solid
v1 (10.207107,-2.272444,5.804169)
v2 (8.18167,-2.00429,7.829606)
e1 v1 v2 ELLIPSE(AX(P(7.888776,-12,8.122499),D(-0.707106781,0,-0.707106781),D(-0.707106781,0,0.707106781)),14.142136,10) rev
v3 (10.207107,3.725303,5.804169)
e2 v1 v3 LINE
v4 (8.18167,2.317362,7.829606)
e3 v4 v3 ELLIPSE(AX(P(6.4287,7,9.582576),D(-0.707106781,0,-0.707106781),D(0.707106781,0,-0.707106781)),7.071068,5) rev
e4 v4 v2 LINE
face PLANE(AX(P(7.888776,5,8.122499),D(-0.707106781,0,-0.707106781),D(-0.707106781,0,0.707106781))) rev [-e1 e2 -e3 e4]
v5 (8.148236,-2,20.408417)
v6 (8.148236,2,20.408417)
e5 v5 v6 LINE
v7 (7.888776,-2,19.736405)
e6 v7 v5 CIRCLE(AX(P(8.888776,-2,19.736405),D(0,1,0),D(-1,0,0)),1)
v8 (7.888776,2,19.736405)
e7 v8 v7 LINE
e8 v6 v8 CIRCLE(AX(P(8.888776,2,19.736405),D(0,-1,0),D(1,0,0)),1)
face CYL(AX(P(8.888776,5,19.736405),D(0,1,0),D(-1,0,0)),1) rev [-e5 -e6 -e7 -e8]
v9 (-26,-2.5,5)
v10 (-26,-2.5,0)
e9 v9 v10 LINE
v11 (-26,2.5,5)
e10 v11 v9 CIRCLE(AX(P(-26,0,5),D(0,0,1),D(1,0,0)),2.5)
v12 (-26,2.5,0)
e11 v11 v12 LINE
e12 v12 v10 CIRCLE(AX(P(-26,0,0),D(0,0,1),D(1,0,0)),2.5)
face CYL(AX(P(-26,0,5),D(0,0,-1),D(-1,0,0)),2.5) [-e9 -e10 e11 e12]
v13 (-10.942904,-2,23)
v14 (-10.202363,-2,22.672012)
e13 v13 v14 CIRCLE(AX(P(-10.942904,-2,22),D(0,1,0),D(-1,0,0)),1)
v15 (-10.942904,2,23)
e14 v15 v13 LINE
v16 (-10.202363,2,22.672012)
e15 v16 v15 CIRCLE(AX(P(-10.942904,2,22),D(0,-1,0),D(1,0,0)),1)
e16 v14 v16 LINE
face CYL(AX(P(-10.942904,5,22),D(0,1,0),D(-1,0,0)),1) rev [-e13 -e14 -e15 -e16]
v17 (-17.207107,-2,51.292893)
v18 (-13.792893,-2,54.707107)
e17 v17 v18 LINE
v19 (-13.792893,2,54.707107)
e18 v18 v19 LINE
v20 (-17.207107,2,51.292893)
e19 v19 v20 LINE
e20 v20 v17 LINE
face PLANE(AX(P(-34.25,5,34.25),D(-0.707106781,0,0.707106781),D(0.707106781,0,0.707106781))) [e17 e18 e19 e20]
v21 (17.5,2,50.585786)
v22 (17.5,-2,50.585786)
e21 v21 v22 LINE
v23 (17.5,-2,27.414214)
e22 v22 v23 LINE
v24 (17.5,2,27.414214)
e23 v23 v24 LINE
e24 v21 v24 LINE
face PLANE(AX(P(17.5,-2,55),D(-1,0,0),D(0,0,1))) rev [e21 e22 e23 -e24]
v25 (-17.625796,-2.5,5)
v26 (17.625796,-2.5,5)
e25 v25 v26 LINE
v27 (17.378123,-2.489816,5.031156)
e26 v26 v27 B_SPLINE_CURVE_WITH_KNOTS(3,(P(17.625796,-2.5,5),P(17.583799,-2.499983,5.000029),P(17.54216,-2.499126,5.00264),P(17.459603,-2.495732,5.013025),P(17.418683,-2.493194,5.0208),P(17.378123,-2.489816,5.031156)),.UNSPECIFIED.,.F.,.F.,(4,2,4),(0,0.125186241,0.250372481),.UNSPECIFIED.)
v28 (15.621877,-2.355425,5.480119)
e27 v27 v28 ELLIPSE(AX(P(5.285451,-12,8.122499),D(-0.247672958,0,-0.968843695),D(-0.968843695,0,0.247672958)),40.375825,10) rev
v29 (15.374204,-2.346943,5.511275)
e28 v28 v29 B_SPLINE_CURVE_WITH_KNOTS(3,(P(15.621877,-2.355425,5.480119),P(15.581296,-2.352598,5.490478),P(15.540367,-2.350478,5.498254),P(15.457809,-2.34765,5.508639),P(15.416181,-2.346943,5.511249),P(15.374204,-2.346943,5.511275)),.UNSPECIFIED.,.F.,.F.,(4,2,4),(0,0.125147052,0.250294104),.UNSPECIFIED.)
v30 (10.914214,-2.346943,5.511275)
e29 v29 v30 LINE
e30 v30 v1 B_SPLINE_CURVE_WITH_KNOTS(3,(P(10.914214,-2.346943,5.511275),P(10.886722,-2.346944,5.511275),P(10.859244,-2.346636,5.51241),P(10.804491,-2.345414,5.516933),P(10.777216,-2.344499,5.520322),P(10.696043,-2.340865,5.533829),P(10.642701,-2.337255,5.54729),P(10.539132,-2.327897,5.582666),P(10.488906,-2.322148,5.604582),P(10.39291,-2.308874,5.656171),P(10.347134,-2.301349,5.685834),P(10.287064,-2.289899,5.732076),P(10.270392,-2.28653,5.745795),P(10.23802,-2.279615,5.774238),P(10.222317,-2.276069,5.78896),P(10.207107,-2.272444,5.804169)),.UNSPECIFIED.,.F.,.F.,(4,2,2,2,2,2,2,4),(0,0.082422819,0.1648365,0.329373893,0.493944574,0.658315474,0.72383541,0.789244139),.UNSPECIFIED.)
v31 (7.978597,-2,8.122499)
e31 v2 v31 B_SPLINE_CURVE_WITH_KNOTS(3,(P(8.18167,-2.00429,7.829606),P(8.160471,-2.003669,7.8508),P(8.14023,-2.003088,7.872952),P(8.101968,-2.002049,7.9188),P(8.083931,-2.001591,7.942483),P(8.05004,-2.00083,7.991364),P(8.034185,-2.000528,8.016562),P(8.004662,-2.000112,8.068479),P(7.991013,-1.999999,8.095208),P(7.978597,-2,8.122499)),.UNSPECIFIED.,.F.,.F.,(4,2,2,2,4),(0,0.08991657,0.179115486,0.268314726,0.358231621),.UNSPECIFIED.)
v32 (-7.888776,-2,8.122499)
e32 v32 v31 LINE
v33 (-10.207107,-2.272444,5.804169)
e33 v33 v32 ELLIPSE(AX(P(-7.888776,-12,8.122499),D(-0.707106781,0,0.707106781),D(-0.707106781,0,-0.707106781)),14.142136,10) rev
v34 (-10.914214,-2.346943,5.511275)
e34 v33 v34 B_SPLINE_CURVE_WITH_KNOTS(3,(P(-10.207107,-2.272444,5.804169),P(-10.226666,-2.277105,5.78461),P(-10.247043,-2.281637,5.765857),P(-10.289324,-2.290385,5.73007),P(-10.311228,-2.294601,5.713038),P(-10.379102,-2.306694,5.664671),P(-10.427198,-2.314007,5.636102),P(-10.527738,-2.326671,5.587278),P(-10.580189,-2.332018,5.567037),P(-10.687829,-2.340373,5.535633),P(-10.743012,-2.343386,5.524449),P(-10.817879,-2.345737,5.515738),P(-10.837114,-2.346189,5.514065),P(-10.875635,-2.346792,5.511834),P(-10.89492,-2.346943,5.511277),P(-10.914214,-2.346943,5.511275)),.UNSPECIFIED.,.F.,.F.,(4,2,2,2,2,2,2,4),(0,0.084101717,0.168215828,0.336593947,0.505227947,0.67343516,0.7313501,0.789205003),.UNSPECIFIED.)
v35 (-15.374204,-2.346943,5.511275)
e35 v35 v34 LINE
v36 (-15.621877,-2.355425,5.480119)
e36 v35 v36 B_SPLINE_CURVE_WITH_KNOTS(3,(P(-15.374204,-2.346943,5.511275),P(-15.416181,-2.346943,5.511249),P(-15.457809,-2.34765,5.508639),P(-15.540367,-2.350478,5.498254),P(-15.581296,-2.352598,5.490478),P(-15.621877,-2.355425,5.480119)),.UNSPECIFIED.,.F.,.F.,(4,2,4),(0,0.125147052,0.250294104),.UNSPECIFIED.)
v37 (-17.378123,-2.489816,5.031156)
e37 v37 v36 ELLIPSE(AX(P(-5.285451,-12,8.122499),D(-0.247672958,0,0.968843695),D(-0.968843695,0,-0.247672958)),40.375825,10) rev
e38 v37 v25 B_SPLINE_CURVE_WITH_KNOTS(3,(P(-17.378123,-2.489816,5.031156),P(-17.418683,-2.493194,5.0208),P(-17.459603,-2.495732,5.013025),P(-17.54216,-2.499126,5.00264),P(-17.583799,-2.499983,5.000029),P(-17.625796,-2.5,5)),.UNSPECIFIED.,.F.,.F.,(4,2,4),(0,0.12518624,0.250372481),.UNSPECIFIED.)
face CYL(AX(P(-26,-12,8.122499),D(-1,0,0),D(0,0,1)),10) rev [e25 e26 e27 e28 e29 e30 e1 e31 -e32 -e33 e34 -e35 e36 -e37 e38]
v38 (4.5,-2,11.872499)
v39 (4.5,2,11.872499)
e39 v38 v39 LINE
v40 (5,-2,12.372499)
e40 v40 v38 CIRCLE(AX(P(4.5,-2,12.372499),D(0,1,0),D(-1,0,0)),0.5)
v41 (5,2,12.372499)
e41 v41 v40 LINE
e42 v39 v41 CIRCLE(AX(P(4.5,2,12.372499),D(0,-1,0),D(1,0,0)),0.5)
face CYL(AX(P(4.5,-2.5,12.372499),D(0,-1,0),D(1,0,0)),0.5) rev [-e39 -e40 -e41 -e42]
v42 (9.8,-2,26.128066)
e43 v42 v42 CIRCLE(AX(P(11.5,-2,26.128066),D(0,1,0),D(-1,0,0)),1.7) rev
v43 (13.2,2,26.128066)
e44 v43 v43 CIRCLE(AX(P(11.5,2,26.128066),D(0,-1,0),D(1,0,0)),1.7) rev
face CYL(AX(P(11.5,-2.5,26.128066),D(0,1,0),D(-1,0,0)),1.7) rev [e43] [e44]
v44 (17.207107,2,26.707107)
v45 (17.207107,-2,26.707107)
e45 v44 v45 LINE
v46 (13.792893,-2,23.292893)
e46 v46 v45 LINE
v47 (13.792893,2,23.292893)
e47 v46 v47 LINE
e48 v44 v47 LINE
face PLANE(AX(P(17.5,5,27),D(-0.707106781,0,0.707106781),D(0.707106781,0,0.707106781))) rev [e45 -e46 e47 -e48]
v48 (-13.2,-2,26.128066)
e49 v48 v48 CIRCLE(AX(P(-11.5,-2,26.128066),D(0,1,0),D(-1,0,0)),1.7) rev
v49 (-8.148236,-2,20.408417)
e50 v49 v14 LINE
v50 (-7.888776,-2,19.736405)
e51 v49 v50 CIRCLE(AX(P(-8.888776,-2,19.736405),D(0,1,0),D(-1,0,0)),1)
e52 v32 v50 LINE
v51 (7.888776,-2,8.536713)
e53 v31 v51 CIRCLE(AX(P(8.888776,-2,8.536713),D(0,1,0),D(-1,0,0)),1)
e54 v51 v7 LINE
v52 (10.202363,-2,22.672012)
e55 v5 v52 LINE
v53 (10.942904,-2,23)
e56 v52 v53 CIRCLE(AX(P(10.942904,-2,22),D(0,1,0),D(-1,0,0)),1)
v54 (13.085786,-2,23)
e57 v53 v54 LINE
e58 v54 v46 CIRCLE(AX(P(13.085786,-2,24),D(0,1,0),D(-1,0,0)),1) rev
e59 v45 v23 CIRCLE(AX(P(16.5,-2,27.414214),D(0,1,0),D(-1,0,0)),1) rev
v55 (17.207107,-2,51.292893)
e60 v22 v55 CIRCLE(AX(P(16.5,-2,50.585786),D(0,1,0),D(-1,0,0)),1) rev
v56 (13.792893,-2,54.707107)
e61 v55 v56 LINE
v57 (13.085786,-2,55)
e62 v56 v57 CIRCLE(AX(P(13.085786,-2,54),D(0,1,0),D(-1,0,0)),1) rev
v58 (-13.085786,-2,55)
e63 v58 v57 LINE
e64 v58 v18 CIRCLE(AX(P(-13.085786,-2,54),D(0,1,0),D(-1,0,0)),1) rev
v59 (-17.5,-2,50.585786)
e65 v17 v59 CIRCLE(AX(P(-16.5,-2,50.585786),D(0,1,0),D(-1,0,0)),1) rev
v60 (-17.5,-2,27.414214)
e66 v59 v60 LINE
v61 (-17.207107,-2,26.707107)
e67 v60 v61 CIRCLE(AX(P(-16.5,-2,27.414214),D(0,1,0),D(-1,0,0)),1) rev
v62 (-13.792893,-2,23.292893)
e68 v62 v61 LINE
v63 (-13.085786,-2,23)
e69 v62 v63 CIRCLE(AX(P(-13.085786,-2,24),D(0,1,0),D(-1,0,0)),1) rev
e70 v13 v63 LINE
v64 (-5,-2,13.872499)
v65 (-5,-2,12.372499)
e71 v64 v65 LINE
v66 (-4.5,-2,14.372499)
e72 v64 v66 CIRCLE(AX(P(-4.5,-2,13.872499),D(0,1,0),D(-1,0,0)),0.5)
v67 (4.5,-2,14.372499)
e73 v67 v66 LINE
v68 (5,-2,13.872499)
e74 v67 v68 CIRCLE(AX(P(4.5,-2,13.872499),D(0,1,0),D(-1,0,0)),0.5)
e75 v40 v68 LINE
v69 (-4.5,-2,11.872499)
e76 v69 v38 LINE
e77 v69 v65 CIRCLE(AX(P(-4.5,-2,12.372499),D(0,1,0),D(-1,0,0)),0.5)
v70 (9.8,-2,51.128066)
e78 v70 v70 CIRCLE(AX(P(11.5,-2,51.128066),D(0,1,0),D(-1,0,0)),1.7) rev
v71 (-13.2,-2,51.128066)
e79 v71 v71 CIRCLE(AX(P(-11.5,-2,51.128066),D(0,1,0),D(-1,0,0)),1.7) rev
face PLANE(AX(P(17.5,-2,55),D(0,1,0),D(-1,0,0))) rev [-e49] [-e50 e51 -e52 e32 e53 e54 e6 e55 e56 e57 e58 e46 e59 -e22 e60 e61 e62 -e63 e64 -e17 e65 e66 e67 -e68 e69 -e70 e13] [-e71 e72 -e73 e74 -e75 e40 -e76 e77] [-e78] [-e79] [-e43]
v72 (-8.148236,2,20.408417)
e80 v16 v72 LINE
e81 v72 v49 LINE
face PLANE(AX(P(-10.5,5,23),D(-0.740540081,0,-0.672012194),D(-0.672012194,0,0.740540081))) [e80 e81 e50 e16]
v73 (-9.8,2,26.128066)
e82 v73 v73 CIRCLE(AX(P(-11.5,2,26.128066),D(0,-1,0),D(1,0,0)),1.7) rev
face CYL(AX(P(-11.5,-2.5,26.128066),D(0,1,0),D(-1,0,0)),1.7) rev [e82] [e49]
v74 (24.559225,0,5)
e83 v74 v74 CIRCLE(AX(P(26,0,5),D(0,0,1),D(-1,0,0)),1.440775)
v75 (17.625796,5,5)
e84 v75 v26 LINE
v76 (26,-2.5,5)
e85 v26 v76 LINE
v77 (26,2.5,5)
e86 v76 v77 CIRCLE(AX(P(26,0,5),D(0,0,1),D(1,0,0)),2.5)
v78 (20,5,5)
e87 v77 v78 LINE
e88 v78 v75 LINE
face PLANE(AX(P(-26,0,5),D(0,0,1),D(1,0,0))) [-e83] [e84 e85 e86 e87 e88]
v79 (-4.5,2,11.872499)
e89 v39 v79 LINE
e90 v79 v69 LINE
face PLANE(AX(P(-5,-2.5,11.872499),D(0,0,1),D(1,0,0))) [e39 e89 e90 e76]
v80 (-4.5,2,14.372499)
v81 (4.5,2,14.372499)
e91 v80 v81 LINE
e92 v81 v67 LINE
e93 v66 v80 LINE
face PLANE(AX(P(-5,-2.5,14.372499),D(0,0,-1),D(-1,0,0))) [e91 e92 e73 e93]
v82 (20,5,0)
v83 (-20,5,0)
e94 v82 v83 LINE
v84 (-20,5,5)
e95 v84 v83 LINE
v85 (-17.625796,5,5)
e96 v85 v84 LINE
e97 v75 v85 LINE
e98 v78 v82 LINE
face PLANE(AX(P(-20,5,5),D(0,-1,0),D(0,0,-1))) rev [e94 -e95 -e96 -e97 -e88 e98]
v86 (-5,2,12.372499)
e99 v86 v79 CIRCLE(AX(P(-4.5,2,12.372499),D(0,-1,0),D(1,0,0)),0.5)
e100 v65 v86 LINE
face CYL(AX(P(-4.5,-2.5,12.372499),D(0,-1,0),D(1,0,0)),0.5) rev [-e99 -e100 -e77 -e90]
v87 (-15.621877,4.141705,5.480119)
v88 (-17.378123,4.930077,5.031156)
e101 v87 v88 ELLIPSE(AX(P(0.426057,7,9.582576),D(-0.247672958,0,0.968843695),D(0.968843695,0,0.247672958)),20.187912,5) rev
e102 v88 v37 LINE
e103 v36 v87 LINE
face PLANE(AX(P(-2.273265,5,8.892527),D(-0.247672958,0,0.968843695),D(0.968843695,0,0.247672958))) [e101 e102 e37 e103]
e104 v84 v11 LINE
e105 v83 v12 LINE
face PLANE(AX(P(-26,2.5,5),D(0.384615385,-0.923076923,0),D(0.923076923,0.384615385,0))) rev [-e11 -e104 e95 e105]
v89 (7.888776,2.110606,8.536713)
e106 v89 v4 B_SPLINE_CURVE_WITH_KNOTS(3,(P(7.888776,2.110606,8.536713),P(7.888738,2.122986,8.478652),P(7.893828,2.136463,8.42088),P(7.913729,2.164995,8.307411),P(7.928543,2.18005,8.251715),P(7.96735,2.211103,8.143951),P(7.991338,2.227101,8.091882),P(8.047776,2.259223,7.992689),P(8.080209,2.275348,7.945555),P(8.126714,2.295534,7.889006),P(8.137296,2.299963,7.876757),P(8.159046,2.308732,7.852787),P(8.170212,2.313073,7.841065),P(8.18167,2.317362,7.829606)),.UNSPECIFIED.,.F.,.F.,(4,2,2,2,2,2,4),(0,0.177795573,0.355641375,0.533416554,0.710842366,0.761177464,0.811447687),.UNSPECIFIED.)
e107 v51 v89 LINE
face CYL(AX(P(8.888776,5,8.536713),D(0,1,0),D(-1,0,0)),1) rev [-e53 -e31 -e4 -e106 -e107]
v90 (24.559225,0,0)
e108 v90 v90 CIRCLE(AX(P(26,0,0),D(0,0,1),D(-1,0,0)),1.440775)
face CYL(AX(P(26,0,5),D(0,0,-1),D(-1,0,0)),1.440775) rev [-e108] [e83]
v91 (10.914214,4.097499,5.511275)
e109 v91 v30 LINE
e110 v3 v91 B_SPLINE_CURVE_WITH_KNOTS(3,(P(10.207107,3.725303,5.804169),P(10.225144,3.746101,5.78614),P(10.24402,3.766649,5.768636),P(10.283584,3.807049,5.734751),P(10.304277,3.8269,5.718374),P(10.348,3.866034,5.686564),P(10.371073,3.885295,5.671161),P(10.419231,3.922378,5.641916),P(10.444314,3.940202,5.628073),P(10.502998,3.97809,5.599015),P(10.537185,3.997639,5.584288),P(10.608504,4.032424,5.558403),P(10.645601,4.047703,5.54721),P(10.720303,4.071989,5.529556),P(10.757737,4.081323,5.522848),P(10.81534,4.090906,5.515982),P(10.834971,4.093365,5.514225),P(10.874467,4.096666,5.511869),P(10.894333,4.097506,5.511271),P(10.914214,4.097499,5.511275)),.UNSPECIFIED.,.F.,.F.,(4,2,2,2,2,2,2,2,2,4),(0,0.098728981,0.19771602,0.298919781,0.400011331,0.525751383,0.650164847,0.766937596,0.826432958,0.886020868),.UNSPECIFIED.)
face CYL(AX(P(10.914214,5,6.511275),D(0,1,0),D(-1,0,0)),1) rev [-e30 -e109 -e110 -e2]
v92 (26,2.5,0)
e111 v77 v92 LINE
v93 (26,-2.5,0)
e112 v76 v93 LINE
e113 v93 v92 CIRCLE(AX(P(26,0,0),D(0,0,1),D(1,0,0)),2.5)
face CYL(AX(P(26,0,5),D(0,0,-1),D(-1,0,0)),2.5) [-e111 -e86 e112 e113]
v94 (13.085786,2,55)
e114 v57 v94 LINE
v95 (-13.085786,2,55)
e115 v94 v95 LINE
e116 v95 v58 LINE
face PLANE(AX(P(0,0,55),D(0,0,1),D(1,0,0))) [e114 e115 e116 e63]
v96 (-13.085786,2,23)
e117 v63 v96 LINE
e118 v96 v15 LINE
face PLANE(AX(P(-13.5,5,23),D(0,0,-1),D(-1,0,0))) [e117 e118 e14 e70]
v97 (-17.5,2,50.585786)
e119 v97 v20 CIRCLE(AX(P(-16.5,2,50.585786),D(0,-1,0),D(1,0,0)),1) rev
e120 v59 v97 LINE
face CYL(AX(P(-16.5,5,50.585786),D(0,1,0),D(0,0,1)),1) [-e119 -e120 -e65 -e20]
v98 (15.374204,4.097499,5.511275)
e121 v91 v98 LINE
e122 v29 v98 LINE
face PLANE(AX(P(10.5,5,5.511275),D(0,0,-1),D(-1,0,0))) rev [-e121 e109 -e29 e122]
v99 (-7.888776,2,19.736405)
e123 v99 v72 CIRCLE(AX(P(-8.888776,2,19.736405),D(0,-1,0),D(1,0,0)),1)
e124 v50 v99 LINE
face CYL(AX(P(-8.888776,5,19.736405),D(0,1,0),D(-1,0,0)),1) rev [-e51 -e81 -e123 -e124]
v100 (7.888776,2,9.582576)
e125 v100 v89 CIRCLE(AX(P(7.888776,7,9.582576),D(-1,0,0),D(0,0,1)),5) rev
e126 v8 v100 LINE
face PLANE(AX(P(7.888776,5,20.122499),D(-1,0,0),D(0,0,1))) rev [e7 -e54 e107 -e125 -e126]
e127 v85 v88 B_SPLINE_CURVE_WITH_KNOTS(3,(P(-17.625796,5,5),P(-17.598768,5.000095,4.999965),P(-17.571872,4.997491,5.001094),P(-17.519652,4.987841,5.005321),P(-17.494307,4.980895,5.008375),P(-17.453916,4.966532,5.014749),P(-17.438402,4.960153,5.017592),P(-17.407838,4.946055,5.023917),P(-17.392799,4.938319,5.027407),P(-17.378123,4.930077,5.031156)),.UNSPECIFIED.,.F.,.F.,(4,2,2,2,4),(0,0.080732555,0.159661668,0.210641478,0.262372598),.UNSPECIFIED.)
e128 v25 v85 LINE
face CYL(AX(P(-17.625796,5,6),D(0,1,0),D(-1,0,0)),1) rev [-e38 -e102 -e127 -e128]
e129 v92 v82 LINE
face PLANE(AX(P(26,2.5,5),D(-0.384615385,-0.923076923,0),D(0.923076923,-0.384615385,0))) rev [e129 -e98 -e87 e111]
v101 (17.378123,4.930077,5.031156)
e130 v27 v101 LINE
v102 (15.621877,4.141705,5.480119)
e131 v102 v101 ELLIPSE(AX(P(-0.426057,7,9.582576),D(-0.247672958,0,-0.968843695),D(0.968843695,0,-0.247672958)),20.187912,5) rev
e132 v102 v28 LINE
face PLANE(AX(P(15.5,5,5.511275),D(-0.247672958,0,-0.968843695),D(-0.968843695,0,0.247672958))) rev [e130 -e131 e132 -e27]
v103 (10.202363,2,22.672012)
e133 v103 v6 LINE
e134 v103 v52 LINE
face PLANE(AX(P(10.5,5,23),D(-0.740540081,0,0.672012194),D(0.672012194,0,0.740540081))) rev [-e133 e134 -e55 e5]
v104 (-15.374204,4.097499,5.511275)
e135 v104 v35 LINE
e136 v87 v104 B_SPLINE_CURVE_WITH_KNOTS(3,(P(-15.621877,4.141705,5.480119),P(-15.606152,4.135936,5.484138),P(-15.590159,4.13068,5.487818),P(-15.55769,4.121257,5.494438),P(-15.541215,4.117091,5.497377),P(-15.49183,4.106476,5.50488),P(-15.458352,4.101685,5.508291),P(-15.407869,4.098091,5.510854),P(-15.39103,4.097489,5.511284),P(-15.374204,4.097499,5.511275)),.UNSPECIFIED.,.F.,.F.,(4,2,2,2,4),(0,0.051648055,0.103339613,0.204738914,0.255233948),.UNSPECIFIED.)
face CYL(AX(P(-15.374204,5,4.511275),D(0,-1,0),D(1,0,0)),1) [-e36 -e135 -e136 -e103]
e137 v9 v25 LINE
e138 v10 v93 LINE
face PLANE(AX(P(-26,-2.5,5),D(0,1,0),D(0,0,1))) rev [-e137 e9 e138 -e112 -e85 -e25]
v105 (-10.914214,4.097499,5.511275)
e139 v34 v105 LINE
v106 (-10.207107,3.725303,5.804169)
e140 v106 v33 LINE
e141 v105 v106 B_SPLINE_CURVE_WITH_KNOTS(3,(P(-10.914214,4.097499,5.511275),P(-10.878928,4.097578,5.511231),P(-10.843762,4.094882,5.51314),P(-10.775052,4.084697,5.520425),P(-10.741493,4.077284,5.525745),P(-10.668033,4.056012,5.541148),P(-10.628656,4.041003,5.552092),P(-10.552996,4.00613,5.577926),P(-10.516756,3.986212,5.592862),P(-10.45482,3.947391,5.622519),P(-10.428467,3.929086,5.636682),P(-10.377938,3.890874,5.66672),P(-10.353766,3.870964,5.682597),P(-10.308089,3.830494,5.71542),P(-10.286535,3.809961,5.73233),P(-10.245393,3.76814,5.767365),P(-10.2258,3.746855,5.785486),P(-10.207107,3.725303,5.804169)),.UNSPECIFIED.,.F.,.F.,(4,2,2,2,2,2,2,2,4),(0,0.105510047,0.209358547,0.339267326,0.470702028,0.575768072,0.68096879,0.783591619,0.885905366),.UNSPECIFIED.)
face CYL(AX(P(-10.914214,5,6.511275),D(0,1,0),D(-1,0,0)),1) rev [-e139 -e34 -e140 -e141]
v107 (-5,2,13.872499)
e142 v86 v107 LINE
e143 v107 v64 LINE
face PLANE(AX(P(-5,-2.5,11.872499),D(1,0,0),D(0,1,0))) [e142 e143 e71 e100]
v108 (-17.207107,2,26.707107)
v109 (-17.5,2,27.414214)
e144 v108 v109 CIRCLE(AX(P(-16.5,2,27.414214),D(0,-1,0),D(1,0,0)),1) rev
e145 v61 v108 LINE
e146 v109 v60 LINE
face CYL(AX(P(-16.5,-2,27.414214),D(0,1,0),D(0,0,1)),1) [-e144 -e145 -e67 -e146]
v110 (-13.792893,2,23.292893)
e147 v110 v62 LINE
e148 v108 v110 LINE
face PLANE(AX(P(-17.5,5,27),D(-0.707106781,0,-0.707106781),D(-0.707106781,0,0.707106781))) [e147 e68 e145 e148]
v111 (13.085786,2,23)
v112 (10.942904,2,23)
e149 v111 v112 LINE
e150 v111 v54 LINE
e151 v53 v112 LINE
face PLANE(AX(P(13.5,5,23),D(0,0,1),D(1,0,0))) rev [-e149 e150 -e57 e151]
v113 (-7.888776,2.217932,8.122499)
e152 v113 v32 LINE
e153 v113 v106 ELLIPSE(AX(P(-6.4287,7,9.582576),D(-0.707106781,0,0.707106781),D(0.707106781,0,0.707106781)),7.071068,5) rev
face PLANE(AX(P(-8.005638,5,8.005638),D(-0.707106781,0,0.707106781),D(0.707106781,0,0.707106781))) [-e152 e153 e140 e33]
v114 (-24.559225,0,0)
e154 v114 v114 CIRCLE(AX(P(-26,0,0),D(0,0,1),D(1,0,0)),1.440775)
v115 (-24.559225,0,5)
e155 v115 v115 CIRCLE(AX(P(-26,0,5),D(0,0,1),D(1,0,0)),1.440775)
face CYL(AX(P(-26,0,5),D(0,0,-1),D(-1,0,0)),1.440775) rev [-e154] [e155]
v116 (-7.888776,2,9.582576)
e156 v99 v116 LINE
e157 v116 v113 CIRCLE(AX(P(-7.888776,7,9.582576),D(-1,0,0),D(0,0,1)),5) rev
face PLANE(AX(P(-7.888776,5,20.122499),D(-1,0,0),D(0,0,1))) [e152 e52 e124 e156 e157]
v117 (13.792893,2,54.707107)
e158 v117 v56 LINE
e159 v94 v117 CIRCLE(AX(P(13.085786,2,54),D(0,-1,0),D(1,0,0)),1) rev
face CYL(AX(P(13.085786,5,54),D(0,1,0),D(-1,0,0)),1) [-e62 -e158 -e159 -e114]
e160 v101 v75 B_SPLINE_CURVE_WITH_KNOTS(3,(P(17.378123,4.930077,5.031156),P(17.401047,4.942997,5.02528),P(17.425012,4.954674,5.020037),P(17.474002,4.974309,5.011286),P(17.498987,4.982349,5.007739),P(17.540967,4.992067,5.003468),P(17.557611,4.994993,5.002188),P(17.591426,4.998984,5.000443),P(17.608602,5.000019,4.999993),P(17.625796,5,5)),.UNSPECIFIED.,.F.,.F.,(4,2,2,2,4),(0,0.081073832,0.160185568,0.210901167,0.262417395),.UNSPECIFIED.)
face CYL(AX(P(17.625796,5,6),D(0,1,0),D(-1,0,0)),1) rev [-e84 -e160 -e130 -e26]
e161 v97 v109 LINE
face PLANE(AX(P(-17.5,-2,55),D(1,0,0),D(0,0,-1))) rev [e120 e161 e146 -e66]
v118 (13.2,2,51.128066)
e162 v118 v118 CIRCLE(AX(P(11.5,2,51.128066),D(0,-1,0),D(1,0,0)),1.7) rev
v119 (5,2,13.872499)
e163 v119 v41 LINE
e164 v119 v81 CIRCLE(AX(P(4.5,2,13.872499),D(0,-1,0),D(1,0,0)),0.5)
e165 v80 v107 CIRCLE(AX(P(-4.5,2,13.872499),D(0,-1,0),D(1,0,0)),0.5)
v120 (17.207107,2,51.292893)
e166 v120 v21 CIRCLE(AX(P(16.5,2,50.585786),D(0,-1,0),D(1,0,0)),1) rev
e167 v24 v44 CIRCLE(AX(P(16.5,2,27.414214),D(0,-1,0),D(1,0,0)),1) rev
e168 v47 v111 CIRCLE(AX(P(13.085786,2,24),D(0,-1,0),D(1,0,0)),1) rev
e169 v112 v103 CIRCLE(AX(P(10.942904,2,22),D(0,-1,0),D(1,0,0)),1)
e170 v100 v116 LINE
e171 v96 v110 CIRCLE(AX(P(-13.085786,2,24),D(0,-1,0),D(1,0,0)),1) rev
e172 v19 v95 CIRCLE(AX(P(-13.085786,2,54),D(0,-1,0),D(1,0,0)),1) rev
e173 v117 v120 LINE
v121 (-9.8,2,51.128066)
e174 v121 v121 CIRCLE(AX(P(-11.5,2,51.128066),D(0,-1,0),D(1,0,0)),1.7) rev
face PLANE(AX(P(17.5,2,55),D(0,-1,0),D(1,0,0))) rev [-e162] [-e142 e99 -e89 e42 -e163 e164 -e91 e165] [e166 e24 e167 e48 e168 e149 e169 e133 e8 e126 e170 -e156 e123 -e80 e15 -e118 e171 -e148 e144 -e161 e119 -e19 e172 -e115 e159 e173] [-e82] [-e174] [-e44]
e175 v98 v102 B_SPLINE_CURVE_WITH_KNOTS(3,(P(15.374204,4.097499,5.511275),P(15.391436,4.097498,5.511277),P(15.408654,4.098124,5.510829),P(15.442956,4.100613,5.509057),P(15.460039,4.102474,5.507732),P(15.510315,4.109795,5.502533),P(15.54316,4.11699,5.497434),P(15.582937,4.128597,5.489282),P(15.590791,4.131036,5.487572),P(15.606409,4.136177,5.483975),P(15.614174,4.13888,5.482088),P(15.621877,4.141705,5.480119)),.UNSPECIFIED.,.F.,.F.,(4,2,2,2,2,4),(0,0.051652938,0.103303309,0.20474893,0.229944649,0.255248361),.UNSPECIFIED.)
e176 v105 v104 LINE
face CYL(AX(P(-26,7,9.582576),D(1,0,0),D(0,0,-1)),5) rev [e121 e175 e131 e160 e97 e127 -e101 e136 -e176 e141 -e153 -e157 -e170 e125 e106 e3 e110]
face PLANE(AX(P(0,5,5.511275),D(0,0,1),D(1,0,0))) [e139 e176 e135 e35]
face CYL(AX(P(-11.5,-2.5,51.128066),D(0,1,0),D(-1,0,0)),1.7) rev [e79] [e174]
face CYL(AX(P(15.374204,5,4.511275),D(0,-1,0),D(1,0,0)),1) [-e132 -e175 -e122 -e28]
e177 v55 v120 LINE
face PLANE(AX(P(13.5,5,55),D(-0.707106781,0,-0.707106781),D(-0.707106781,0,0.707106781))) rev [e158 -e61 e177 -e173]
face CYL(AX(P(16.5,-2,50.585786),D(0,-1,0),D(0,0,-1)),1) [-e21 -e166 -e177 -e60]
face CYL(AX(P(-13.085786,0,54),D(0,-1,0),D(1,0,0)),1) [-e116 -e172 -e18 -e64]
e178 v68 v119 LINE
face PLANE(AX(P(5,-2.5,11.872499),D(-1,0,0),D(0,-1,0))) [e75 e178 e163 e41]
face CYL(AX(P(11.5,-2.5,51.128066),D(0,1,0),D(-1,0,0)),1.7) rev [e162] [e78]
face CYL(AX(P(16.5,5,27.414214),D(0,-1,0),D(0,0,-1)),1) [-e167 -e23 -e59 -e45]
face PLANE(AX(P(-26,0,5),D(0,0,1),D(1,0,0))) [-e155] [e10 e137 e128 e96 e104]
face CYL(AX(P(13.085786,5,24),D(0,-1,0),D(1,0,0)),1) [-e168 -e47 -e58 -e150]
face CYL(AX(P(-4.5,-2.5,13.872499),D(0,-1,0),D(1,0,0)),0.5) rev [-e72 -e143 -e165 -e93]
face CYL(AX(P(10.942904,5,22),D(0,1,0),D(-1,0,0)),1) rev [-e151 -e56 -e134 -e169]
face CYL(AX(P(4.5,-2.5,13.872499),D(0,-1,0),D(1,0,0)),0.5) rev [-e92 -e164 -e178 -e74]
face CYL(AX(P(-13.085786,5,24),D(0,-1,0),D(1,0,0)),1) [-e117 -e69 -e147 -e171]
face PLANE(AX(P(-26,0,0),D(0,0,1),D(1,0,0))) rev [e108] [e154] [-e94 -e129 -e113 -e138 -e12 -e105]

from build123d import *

# Parameters (mm, degrees)
SKETCH_1_R                      = 1.440775231
EXTRUDE_1_DEPTH                 = 5
SKETCH_3_W                      = 35
SKETCH_3_H                      = 4
EXTRUDE_2_DEPTH                 = 50
FILLET_1_R                      = 10
FILLET_2_R                      = 5
CUT_EXTRUDE_2_DEPTH             = 63.339794674
CUT_EXTRUDE_2_DEPTH_BACK        = 63.339794674
CUT_EXTRUDE_3_REACH             = 64.34
SKETCH_5_R                      = 1.7
SKETCH_5_W                      = 10
SKETCH_5_H                      = 2.5
CUT_EXTRUDE_3_DIRECTION_2_DEPTH = 63.339794674
FILLET_3_R                      = 0.5
FILLET_4_R                      = 1


with BuildPart() as part:
    # 草图1 → 凸台-拉伸1 (new body)
    with BuildSketch(Plane.XY):
        with BuildLine():
            Line((-26, -2.5), (26, -2.5))
            ThreePointArc((26, -2.5), (28.5, 0), (26, 2.5))
            Line((26, 2.5), (20, 5))
            Line((20, 5), (-20, 5))
            Line((-20, 5), (-26, 2.5))
            ThreePointArc((-26, 2.5), (-28.5, 0), (-26, -2.5))
        make_face()
        with Locations((-26, 0)):
            Circle(SKETCH_1_R, mode=Mode.SUBTRACT)
        with Locations(Location((26, 0, 0), (0, 0, 180))):
            Circle(SKETCH_1_R, mode=Mode.SUBTRACT)
    extrude(amount=EXTRUDE_1_DEPTH)

    # 草图3 → 凸台-拉伸2 (add)
    with BuildSketch(Plane.XY.offset(5)):
        Rectangle(SKETCH_3_W, SKETCH_3_H)
    extrude(amount=EXTRUDE_2_DEPTH)

    # 圆角1
    # the kernel refuses this fillet: 10 mm, written as the material it adds along each edge
    with BuildSketch(Plane(origin=(17.5, -2, 5), x_dir=(0, -1.0, 2.1849189124477904e-12), z_dir=(-1, 0, 0))) as fillet_1_piece_1:
        with BuildLine():
            CenterArc((10, 3.122498999), FILLET_1_R, 180, 18.194872339)
            Line((0, 3.122498999), (-0.2, 3.122498999))
            Line((-0.2, 3.122498999), (-0.2, 0))
            Line((-0.2, 0), (0, -0.2))
            ThreePointArc((0, -0.2), (0.25, -0.2), (0.31, -0.06244998))
            Line((0.31, -0.06244998), (0.5, 0))
        make_face()
    extrude(amount=35)

    # 圆角2
    # the kernel refuses this fillet: 5 mm, written as the material it adds along each edge
    with BuildSketch(Plane(origin=(-17.5, 2, 5), x_dir=(0, 0, 1), z_dir=(1, 0, 0))) as fillet_2_piece_1:
        with BuildLine():
            CenterArc((4.582575695, -5), FILLET_2_R, 90, 66.421821522)
            Line((0, -3), (-0.091651514, -2.96))
            ThreePointArc((-0.091651514, -2.96), (-0.1, -1.5), (-0.1, 0))
            Line((-0.1, 0), (0, 0.1))
            Line((0, 0.1), (4.582575695, 0.1))
            Line((4.582575695, 0.1), (4.582575695, 0))
        make_face()
    extrude(amount=35)

    # 草图4 → 切除-拉伸2 (cut, two sides: drawn at the far end of the back side and taken through both)
    with BuildSketch(Plane.XZ.offset(2).offset(-CUT_EXTRUDE_2_DEPTH_BACK)):
        Polygon((-17.5, 51), (-13.5, 55), (-17.5, 55), align=None)
        Polygon((-13.5, 23), (-17.5, 27), (-17.5, 5), (-15.5, 5.511275368), (-10.5, 5.511275368), (-7.888776369, 8.122498999), (-7.888776369, 20.122498999), (-10.5, 23), align=None)
        Polygon((17.5, 5), (17.5, 27), (13.5, 23), (10.5, 23), (7.888776369, 20.122498999), (7.888776369, 8.122498999), (10.5, 5.511275368), (15.5, 5.511275368), align=None)
        Polygon((17.5, 51), (17.5, 55), (13.5, 55), align=None)
    extrude(amount=CUT_EXTRUDE_2_DEPTH + CUT_EXTRUDE_2_DEPTH_BACK, mode=Mode.SUBTRACT)

    # 草图5 → 切除-拉伸3 (cut, up to next)
    with BuildSketch(Plane.XZ.offset(2), mode=Mode.PRIVATE) as cut_extrude_3_sk1:
        with Locations(Location((-11.5, 26.128065597, 0), (0, 0, 180))):
            Circle(SKETCH_5_R)
    cut_extrude_3_tool1 = extrude(cut_extrude_3_sk1.sketch, amount=-CUT_EXTRUDE_3_REACH, mode=Mode.PRIVATE) & part.part
    # 草图5 → 切除-拉伸3 (cut, up to next)
    with BuildSketch(Plane.XZ.offset(2), mode=Mode.PRIVATE) as cut_extrude_3_sk2:
        with Locations(Location((11.5, 26.128065597, 0), (0, 0, 180))):
            Circle(SKETCH_5_R)
    cut_extrude_3_tool2 = extrude(cut_extrude_3_sk2.sketch, amount=-CUT_EXTRUDE_3_REACH, mode=Mode.PRIVATE) & part.part
    # 草图5 → 切除-拉伸3 (cut, up to next)
    with BuildSketch(Plane.XZ.offset(2), mode=Mode.PRIVATE) as cut_extrude_3_sk3:
        with Locations(Location((11.5, 51.128065597, 0), (0, 0, 180))):
            Circle(SKETCH_5_R)
    cut_extrude_3_tool3 = extrude(cut_extrude_3_sk3.sketch, amount=-CUT_EXTRUDE_3_REACH, mode=Mode.PRIVATE) & part.part
    # 草图5 → 切除-拉伸3 (cut, up to next)
    with BuildSketch(Plane.XZ.offset(2), mode=Mode.PRIVATE) as cut_extrude_3_sk4:
        with Locations(Location((-11.5, 51.128065597, 0), (0, 0, 180))):
            Circle(SKETCH_5_R)
    cut_extrude_3_tool4 = extrude(cut_extrude_3_sk4.sketch, amount=-CUT_EXTRUDE_3_REACH, mode=Mode.PRIVATE) & part.part
    # 草图5 → 切除-拉伸3 (cut, up to next)
    with BuildSketch(Plane.XZ.offset(2), mode=Mode.PRIVATE) as cut_extrude_3_sk5:
        with Locations((0, 13.122498999)):
            Rectangle(SKETCH_5_W, SKETCH_5_H)
    cut_extrude_3_tool5 = extrude(cut_extrude_3_sk5.sketch, amount=-CUT_EXTRUDE_3_REACH, mode=Mode.PRIVATE) & part.part
    add(cut_extrude_3_tool1.solids().sort_by_distance((-11.5, -2, 26.128066))[0], mode=Mode.SUBTRACT)
    add(cut_extrude_3_tool2.solids().sort_by_distance((11.5, -2, 26.128066))[0], mode=Mode.SUBTRACT)
    add(cut_extrude_3_tool3.solids().sort_by_distance((11.5, -2, 51.128066))[0], mode=Mode.SUBTRACT)
    add(cut_extrude_3_tool4.solids().sort_by_distance((-11.5, -2, 51.128066))[0], mode=Mode.SUBTRACT)
    add(cut_extrude_3_tool5.solids().sort_by_distance((0, -2, 13.122499))[0], mode=Mode.SUBTRACT)

    # 草图5 → 切除-拉伸3 direction 2 (cut)
    with BuildSketch(Plane.XZ.offset(2)):
        with Locations(Location((-11.5, 26.128065597, 0), (0, 0, 180))):
            Circle(SKETCH_5_R)
        with Locations(Location((11.5, 26.128065597, 0), (0, 0, 180))):
            Circle(SKETCH_5_R)
        with Locations(Location((11.5, 51.128065597, 0), (0, 0, 180))):
            Circle(SKETCH_5_R)
        with Locations(Location((-11.5, 51.128065597, 0), (0, 0, 180))):
            Circle(SKETCH_5_R)
        with Locations((0, 13.122498999)):
            Rectangle(SKETCH_5_W, SKETCH_5_H)
    extrude(amount=CUT_EXTRUDE_3_DIRECTION_2_DEPTH, mode=Mode.SUBTRACT)

    # 圆角3
    fillet_3_edges = [part.edges().sort_by_distance(p)[0] for p in [
        (5, 0, 11.872498999),
        (5, 0, 14.372498999),
        (-5, 0, 14.372498999),
        (-5, 0, 11.872498999),
    ]]
    fillet(fillet_3_edges, radius=FILLET_3_R)

    # 圆角4
    fillet_4_edges = [part.edges().sort_by_distance(p)[0] for p in [
        (17.5, 0, 51),
        (13.5, 0, 55),
        (17.5, 0, 27),
        (13.5, 0, 23),
        (10.5, 0, 23),
        (7.888776369, 0, 20.122498999),
        (7.888776369, 0.108965912, 8.122498999),
        (10.5, 0.875277907, 5.511275368),
        (15.5, 0.875277907, 5.511275368),
        (17.5, 1.25, 5),
        (-17.5, 1.25, 5),
        (-15.5, 0.875277907, 5.511275368),
        (-10.5, 0.875277907, 5.511275368),
        (-7.888776369, 0, 20.122498999),
        (-10.5, 0, 23),
        (-13.5, 0, 23),
        (-17.5, 0, 27),
        (-17.5, 0, 51),
        (-13.5, 0, 55),
    ]]
    fillet(fillet_4_edges, radius=FILLET_4_R)


solid = part.part
